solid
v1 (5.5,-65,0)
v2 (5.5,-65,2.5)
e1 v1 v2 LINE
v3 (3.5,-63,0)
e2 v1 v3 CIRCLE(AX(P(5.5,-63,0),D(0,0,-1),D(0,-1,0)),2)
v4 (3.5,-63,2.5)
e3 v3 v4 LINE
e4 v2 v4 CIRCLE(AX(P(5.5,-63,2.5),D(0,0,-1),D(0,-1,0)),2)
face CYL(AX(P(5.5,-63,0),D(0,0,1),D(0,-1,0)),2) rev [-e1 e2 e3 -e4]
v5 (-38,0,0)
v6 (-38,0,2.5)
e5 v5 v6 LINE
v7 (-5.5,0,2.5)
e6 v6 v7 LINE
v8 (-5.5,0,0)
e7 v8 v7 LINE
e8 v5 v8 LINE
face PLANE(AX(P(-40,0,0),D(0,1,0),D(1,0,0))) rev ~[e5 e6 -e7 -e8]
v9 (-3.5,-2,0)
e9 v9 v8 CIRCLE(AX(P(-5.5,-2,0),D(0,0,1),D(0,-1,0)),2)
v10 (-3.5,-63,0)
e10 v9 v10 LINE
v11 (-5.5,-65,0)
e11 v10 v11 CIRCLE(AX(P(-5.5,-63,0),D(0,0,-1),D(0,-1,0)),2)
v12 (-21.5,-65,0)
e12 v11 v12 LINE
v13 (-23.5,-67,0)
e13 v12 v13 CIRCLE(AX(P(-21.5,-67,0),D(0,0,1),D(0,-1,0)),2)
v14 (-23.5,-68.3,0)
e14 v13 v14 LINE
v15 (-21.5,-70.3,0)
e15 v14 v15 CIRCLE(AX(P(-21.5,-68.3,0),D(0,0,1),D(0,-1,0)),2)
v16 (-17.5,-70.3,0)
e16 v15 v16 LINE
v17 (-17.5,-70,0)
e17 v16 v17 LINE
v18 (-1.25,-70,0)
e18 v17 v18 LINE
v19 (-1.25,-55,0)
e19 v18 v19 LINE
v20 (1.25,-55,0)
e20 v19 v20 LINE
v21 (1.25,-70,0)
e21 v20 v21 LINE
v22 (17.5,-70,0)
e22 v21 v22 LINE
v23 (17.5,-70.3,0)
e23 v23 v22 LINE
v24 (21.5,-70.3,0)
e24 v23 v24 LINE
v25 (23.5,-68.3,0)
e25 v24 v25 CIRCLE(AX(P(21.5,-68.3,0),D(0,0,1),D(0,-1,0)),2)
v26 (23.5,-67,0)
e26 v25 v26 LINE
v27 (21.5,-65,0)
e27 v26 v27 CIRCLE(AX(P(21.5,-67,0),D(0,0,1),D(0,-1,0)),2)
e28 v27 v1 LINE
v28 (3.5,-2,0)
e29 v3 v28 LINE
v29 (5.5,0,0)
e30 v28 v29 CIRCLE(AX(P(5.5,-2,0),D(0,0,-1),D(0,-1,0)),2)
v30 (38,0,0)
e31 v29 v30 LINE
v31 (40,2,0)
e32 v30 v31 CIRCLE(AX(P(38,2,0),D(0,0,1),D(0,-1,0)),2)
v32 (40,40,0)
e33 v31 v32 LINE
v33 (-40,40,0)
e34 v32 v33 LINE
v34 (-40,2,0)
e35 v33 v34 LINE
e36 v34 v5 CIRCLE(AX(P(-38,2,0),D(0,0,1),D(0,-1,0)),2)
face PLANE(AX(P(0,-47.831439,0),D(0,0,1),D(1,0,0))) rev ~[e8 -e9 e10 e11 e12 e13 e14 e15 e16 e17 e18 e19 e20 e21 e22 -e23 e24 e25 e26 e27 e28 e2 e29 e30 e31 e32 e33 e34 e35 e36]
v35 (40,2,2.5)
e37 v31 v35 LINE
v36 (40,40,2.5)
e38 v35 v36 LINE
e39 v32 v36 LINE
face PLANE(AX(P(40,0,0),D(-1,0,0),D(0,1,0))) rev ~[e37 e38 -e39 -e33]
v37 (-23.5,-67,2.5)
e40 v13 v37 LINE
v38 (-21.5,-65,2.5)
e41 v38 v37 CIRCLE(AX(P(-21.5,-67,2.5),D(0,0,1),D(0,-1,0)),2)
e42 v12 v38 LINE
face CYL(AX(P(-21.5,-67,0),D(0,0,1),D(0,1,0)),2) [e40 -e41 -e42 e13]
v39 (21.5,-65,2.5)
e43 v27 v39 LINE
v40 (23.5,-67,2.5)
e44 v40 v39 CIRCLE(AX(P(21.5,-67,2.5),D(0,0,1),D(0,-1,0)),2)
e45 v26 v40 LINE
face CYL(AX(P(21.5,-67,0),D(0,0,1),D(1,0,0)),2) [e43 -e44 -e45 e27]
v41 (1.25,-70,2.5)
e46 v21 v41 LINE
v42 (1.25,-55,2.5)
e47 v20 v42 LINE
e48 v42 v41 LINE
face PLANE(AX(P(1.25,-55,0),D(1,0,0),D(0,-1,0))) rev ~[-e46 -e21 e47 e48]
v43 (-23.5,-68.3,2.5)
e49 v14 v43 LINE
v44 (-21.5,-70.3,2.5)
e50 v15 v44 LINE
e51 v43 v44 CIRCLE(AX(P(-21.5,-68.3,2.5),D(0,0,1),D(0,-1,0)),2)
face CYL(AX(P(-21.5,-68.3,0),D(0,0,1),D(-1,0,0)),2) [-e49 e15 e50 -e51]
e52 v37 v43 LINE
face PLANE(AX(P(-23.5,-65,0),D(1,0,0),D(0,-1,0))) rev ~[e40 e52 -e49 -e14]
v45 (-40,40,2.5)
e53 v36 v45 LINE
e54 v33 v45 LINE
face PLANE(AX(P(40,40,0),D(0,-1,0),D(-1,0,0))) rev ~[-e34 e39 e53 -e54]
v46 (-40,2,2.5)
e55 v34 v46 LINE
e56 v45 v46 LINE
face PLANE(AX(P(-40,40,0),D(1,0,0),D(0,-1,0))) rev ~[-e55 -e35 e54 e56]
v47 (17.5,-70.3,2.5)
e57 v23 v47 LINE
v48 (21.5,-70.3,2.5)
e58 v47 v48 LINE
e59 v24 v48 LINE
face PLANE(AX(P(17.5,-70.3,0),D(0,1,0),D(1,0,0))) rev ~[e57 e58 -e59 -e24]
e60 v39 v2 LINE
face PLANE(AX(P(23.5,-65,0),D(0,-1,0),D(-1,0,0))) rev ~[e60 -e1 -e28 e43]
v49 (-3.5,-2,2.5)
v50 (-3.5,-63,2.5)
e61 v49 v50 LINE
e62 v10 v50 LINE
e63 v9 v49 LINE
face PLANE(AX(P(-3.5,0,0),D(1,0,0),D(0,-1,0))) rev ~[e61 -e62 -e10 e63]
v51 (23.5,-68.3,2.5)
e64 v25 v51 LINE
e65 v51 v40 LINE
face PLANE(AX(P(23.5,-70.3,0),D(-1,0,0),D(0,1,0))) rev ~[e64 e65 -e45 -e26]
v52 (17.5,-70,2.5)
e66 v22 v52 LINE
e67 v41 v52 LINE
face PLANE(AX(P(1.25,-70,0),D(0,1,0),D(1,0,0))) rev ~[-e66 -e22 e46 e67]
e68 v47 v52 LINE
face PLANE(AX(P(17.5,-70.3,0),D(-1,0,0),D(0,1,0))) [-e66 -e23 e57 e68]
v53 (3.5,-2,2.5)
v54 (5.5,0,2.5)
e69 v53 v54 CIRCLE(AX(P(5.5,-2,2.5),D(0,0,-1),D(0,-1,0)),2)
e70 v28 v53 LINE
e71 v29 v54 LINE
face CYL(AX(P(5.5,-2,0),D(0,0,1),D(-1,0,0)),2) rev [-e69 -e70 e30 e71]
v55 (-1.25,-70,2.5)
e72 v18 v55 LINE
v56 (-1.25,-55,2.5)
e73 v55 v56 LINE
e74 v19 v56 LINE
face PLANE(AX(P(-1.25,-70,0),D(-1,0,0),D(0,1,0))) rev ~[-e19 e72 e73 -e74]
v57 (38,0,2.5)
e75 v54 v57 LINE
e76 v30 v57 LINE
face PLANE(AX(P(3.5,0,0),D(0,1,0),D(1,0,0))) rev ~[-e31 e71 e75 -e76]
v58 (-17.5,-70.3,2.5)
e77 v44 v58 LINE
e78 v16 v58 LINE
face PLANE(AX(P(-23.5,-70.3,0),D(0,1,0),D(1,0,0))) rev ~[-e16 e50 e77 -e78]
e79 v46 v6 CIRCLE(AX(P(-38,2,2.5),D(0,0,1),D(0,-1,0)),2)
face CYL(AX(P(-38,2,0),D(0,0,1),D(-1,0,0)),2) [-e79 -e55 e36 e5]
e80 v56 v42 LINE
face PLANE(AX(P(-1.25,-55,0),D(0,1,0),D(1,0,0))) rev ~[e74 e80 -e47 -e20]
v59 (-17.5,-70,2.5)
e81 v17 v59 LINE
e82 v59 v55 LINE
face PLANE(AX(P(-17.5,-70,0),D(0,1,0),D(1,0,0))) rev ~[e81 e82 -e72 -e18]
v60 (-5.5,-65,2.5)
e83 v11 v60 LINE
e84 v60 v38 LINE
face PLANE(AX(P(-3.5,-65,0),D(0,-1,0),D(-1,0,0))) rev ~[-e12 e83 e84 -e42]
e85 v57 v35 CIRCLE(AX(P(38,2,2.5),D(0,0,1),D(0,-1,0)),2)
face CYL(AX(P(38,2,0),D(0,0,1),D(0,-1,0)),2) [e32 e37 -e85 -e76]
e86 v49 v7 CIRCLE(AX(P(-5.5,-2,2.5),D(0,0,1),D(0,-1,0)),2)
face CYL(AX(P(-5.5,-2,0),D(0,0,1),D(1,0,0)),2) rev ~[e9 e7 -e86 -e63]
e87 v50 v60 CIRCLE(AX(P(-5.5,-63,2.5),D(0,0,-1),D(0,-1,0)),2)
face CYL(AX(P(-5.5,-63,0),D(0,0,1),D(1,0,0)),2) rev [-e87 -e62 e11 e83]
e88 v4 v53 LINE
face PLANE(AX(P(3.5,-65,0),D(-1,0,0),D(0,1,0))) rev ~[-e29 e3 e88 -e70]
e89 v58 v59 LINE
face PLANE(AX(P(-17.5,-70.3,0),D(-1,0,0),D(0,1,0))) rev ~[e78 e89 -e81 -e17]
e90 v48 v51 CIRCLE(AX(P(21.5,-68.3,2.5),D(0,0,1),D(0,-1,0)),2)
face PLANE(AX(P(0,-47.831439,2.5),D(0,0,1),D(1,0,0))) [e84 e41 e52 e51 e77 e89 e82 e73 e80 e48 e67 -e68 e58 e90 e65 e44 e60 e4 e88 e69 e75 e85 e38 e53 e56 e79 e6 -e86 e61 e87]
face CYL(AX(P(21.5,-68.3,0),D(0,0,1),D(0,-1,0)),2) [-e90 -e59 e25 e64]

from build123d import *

# Parameters (mm, degrees)
F0_W     = 6
F0_H     = 0.3
F1_DEPTH = 2.5
F2_R     = 2


# Not quite as in the source:
# - a feature names something its author has since deleted; it is built from what else it names


with BuildPart() as f1:
    # F0 (on Top) → F1 (new body)
    with BuildSketch(Plane.XY):
        Polygon((3.5, 0), (-3.5, 0), (-3.5, -65), (-23.5, -65), (-23.5, -70), (-17.5, -70), (-1.25, -70), (-1.25, -55), (1.25, -55), (1.25, -70), (17.5, -70), (23.5, -70), (23.5, -65), (3.5, -65), align=None)
        with Locations((-20.5, -70.15)):
            Rectangle(F0_W, F0_H)
        with Locations((20.5, -70.15)):
            Rectangle(F0_W, F0_H)
        Polygon((-40, 40), (-40, 0), (-3.5, 0), (3.5, 0), (40, 0), (40, 40), align=None)
    extrude(amount=F1_DEPTH)

    # F2
    f2_edges = [f1.edges().sort_by_distance(p)[0] for p in [
        (-3.5, 0, 1.25),
        (3.5, 0, 1.25),
        (3.5, -65, 1.25),
        (-3.5, -65, 1.25),
        (-23.5, -65, 1.25),
        (23.5, -65, 1.25),
        (-23.5, -70.3, 1.25),
        (23.5, -70.3, 1.25),
        (40, 0, 1.25),
        (-40, 0, 1.25),
    ]]
    fillet(f2_edges, radius=F2_R)


solid = f1.part
